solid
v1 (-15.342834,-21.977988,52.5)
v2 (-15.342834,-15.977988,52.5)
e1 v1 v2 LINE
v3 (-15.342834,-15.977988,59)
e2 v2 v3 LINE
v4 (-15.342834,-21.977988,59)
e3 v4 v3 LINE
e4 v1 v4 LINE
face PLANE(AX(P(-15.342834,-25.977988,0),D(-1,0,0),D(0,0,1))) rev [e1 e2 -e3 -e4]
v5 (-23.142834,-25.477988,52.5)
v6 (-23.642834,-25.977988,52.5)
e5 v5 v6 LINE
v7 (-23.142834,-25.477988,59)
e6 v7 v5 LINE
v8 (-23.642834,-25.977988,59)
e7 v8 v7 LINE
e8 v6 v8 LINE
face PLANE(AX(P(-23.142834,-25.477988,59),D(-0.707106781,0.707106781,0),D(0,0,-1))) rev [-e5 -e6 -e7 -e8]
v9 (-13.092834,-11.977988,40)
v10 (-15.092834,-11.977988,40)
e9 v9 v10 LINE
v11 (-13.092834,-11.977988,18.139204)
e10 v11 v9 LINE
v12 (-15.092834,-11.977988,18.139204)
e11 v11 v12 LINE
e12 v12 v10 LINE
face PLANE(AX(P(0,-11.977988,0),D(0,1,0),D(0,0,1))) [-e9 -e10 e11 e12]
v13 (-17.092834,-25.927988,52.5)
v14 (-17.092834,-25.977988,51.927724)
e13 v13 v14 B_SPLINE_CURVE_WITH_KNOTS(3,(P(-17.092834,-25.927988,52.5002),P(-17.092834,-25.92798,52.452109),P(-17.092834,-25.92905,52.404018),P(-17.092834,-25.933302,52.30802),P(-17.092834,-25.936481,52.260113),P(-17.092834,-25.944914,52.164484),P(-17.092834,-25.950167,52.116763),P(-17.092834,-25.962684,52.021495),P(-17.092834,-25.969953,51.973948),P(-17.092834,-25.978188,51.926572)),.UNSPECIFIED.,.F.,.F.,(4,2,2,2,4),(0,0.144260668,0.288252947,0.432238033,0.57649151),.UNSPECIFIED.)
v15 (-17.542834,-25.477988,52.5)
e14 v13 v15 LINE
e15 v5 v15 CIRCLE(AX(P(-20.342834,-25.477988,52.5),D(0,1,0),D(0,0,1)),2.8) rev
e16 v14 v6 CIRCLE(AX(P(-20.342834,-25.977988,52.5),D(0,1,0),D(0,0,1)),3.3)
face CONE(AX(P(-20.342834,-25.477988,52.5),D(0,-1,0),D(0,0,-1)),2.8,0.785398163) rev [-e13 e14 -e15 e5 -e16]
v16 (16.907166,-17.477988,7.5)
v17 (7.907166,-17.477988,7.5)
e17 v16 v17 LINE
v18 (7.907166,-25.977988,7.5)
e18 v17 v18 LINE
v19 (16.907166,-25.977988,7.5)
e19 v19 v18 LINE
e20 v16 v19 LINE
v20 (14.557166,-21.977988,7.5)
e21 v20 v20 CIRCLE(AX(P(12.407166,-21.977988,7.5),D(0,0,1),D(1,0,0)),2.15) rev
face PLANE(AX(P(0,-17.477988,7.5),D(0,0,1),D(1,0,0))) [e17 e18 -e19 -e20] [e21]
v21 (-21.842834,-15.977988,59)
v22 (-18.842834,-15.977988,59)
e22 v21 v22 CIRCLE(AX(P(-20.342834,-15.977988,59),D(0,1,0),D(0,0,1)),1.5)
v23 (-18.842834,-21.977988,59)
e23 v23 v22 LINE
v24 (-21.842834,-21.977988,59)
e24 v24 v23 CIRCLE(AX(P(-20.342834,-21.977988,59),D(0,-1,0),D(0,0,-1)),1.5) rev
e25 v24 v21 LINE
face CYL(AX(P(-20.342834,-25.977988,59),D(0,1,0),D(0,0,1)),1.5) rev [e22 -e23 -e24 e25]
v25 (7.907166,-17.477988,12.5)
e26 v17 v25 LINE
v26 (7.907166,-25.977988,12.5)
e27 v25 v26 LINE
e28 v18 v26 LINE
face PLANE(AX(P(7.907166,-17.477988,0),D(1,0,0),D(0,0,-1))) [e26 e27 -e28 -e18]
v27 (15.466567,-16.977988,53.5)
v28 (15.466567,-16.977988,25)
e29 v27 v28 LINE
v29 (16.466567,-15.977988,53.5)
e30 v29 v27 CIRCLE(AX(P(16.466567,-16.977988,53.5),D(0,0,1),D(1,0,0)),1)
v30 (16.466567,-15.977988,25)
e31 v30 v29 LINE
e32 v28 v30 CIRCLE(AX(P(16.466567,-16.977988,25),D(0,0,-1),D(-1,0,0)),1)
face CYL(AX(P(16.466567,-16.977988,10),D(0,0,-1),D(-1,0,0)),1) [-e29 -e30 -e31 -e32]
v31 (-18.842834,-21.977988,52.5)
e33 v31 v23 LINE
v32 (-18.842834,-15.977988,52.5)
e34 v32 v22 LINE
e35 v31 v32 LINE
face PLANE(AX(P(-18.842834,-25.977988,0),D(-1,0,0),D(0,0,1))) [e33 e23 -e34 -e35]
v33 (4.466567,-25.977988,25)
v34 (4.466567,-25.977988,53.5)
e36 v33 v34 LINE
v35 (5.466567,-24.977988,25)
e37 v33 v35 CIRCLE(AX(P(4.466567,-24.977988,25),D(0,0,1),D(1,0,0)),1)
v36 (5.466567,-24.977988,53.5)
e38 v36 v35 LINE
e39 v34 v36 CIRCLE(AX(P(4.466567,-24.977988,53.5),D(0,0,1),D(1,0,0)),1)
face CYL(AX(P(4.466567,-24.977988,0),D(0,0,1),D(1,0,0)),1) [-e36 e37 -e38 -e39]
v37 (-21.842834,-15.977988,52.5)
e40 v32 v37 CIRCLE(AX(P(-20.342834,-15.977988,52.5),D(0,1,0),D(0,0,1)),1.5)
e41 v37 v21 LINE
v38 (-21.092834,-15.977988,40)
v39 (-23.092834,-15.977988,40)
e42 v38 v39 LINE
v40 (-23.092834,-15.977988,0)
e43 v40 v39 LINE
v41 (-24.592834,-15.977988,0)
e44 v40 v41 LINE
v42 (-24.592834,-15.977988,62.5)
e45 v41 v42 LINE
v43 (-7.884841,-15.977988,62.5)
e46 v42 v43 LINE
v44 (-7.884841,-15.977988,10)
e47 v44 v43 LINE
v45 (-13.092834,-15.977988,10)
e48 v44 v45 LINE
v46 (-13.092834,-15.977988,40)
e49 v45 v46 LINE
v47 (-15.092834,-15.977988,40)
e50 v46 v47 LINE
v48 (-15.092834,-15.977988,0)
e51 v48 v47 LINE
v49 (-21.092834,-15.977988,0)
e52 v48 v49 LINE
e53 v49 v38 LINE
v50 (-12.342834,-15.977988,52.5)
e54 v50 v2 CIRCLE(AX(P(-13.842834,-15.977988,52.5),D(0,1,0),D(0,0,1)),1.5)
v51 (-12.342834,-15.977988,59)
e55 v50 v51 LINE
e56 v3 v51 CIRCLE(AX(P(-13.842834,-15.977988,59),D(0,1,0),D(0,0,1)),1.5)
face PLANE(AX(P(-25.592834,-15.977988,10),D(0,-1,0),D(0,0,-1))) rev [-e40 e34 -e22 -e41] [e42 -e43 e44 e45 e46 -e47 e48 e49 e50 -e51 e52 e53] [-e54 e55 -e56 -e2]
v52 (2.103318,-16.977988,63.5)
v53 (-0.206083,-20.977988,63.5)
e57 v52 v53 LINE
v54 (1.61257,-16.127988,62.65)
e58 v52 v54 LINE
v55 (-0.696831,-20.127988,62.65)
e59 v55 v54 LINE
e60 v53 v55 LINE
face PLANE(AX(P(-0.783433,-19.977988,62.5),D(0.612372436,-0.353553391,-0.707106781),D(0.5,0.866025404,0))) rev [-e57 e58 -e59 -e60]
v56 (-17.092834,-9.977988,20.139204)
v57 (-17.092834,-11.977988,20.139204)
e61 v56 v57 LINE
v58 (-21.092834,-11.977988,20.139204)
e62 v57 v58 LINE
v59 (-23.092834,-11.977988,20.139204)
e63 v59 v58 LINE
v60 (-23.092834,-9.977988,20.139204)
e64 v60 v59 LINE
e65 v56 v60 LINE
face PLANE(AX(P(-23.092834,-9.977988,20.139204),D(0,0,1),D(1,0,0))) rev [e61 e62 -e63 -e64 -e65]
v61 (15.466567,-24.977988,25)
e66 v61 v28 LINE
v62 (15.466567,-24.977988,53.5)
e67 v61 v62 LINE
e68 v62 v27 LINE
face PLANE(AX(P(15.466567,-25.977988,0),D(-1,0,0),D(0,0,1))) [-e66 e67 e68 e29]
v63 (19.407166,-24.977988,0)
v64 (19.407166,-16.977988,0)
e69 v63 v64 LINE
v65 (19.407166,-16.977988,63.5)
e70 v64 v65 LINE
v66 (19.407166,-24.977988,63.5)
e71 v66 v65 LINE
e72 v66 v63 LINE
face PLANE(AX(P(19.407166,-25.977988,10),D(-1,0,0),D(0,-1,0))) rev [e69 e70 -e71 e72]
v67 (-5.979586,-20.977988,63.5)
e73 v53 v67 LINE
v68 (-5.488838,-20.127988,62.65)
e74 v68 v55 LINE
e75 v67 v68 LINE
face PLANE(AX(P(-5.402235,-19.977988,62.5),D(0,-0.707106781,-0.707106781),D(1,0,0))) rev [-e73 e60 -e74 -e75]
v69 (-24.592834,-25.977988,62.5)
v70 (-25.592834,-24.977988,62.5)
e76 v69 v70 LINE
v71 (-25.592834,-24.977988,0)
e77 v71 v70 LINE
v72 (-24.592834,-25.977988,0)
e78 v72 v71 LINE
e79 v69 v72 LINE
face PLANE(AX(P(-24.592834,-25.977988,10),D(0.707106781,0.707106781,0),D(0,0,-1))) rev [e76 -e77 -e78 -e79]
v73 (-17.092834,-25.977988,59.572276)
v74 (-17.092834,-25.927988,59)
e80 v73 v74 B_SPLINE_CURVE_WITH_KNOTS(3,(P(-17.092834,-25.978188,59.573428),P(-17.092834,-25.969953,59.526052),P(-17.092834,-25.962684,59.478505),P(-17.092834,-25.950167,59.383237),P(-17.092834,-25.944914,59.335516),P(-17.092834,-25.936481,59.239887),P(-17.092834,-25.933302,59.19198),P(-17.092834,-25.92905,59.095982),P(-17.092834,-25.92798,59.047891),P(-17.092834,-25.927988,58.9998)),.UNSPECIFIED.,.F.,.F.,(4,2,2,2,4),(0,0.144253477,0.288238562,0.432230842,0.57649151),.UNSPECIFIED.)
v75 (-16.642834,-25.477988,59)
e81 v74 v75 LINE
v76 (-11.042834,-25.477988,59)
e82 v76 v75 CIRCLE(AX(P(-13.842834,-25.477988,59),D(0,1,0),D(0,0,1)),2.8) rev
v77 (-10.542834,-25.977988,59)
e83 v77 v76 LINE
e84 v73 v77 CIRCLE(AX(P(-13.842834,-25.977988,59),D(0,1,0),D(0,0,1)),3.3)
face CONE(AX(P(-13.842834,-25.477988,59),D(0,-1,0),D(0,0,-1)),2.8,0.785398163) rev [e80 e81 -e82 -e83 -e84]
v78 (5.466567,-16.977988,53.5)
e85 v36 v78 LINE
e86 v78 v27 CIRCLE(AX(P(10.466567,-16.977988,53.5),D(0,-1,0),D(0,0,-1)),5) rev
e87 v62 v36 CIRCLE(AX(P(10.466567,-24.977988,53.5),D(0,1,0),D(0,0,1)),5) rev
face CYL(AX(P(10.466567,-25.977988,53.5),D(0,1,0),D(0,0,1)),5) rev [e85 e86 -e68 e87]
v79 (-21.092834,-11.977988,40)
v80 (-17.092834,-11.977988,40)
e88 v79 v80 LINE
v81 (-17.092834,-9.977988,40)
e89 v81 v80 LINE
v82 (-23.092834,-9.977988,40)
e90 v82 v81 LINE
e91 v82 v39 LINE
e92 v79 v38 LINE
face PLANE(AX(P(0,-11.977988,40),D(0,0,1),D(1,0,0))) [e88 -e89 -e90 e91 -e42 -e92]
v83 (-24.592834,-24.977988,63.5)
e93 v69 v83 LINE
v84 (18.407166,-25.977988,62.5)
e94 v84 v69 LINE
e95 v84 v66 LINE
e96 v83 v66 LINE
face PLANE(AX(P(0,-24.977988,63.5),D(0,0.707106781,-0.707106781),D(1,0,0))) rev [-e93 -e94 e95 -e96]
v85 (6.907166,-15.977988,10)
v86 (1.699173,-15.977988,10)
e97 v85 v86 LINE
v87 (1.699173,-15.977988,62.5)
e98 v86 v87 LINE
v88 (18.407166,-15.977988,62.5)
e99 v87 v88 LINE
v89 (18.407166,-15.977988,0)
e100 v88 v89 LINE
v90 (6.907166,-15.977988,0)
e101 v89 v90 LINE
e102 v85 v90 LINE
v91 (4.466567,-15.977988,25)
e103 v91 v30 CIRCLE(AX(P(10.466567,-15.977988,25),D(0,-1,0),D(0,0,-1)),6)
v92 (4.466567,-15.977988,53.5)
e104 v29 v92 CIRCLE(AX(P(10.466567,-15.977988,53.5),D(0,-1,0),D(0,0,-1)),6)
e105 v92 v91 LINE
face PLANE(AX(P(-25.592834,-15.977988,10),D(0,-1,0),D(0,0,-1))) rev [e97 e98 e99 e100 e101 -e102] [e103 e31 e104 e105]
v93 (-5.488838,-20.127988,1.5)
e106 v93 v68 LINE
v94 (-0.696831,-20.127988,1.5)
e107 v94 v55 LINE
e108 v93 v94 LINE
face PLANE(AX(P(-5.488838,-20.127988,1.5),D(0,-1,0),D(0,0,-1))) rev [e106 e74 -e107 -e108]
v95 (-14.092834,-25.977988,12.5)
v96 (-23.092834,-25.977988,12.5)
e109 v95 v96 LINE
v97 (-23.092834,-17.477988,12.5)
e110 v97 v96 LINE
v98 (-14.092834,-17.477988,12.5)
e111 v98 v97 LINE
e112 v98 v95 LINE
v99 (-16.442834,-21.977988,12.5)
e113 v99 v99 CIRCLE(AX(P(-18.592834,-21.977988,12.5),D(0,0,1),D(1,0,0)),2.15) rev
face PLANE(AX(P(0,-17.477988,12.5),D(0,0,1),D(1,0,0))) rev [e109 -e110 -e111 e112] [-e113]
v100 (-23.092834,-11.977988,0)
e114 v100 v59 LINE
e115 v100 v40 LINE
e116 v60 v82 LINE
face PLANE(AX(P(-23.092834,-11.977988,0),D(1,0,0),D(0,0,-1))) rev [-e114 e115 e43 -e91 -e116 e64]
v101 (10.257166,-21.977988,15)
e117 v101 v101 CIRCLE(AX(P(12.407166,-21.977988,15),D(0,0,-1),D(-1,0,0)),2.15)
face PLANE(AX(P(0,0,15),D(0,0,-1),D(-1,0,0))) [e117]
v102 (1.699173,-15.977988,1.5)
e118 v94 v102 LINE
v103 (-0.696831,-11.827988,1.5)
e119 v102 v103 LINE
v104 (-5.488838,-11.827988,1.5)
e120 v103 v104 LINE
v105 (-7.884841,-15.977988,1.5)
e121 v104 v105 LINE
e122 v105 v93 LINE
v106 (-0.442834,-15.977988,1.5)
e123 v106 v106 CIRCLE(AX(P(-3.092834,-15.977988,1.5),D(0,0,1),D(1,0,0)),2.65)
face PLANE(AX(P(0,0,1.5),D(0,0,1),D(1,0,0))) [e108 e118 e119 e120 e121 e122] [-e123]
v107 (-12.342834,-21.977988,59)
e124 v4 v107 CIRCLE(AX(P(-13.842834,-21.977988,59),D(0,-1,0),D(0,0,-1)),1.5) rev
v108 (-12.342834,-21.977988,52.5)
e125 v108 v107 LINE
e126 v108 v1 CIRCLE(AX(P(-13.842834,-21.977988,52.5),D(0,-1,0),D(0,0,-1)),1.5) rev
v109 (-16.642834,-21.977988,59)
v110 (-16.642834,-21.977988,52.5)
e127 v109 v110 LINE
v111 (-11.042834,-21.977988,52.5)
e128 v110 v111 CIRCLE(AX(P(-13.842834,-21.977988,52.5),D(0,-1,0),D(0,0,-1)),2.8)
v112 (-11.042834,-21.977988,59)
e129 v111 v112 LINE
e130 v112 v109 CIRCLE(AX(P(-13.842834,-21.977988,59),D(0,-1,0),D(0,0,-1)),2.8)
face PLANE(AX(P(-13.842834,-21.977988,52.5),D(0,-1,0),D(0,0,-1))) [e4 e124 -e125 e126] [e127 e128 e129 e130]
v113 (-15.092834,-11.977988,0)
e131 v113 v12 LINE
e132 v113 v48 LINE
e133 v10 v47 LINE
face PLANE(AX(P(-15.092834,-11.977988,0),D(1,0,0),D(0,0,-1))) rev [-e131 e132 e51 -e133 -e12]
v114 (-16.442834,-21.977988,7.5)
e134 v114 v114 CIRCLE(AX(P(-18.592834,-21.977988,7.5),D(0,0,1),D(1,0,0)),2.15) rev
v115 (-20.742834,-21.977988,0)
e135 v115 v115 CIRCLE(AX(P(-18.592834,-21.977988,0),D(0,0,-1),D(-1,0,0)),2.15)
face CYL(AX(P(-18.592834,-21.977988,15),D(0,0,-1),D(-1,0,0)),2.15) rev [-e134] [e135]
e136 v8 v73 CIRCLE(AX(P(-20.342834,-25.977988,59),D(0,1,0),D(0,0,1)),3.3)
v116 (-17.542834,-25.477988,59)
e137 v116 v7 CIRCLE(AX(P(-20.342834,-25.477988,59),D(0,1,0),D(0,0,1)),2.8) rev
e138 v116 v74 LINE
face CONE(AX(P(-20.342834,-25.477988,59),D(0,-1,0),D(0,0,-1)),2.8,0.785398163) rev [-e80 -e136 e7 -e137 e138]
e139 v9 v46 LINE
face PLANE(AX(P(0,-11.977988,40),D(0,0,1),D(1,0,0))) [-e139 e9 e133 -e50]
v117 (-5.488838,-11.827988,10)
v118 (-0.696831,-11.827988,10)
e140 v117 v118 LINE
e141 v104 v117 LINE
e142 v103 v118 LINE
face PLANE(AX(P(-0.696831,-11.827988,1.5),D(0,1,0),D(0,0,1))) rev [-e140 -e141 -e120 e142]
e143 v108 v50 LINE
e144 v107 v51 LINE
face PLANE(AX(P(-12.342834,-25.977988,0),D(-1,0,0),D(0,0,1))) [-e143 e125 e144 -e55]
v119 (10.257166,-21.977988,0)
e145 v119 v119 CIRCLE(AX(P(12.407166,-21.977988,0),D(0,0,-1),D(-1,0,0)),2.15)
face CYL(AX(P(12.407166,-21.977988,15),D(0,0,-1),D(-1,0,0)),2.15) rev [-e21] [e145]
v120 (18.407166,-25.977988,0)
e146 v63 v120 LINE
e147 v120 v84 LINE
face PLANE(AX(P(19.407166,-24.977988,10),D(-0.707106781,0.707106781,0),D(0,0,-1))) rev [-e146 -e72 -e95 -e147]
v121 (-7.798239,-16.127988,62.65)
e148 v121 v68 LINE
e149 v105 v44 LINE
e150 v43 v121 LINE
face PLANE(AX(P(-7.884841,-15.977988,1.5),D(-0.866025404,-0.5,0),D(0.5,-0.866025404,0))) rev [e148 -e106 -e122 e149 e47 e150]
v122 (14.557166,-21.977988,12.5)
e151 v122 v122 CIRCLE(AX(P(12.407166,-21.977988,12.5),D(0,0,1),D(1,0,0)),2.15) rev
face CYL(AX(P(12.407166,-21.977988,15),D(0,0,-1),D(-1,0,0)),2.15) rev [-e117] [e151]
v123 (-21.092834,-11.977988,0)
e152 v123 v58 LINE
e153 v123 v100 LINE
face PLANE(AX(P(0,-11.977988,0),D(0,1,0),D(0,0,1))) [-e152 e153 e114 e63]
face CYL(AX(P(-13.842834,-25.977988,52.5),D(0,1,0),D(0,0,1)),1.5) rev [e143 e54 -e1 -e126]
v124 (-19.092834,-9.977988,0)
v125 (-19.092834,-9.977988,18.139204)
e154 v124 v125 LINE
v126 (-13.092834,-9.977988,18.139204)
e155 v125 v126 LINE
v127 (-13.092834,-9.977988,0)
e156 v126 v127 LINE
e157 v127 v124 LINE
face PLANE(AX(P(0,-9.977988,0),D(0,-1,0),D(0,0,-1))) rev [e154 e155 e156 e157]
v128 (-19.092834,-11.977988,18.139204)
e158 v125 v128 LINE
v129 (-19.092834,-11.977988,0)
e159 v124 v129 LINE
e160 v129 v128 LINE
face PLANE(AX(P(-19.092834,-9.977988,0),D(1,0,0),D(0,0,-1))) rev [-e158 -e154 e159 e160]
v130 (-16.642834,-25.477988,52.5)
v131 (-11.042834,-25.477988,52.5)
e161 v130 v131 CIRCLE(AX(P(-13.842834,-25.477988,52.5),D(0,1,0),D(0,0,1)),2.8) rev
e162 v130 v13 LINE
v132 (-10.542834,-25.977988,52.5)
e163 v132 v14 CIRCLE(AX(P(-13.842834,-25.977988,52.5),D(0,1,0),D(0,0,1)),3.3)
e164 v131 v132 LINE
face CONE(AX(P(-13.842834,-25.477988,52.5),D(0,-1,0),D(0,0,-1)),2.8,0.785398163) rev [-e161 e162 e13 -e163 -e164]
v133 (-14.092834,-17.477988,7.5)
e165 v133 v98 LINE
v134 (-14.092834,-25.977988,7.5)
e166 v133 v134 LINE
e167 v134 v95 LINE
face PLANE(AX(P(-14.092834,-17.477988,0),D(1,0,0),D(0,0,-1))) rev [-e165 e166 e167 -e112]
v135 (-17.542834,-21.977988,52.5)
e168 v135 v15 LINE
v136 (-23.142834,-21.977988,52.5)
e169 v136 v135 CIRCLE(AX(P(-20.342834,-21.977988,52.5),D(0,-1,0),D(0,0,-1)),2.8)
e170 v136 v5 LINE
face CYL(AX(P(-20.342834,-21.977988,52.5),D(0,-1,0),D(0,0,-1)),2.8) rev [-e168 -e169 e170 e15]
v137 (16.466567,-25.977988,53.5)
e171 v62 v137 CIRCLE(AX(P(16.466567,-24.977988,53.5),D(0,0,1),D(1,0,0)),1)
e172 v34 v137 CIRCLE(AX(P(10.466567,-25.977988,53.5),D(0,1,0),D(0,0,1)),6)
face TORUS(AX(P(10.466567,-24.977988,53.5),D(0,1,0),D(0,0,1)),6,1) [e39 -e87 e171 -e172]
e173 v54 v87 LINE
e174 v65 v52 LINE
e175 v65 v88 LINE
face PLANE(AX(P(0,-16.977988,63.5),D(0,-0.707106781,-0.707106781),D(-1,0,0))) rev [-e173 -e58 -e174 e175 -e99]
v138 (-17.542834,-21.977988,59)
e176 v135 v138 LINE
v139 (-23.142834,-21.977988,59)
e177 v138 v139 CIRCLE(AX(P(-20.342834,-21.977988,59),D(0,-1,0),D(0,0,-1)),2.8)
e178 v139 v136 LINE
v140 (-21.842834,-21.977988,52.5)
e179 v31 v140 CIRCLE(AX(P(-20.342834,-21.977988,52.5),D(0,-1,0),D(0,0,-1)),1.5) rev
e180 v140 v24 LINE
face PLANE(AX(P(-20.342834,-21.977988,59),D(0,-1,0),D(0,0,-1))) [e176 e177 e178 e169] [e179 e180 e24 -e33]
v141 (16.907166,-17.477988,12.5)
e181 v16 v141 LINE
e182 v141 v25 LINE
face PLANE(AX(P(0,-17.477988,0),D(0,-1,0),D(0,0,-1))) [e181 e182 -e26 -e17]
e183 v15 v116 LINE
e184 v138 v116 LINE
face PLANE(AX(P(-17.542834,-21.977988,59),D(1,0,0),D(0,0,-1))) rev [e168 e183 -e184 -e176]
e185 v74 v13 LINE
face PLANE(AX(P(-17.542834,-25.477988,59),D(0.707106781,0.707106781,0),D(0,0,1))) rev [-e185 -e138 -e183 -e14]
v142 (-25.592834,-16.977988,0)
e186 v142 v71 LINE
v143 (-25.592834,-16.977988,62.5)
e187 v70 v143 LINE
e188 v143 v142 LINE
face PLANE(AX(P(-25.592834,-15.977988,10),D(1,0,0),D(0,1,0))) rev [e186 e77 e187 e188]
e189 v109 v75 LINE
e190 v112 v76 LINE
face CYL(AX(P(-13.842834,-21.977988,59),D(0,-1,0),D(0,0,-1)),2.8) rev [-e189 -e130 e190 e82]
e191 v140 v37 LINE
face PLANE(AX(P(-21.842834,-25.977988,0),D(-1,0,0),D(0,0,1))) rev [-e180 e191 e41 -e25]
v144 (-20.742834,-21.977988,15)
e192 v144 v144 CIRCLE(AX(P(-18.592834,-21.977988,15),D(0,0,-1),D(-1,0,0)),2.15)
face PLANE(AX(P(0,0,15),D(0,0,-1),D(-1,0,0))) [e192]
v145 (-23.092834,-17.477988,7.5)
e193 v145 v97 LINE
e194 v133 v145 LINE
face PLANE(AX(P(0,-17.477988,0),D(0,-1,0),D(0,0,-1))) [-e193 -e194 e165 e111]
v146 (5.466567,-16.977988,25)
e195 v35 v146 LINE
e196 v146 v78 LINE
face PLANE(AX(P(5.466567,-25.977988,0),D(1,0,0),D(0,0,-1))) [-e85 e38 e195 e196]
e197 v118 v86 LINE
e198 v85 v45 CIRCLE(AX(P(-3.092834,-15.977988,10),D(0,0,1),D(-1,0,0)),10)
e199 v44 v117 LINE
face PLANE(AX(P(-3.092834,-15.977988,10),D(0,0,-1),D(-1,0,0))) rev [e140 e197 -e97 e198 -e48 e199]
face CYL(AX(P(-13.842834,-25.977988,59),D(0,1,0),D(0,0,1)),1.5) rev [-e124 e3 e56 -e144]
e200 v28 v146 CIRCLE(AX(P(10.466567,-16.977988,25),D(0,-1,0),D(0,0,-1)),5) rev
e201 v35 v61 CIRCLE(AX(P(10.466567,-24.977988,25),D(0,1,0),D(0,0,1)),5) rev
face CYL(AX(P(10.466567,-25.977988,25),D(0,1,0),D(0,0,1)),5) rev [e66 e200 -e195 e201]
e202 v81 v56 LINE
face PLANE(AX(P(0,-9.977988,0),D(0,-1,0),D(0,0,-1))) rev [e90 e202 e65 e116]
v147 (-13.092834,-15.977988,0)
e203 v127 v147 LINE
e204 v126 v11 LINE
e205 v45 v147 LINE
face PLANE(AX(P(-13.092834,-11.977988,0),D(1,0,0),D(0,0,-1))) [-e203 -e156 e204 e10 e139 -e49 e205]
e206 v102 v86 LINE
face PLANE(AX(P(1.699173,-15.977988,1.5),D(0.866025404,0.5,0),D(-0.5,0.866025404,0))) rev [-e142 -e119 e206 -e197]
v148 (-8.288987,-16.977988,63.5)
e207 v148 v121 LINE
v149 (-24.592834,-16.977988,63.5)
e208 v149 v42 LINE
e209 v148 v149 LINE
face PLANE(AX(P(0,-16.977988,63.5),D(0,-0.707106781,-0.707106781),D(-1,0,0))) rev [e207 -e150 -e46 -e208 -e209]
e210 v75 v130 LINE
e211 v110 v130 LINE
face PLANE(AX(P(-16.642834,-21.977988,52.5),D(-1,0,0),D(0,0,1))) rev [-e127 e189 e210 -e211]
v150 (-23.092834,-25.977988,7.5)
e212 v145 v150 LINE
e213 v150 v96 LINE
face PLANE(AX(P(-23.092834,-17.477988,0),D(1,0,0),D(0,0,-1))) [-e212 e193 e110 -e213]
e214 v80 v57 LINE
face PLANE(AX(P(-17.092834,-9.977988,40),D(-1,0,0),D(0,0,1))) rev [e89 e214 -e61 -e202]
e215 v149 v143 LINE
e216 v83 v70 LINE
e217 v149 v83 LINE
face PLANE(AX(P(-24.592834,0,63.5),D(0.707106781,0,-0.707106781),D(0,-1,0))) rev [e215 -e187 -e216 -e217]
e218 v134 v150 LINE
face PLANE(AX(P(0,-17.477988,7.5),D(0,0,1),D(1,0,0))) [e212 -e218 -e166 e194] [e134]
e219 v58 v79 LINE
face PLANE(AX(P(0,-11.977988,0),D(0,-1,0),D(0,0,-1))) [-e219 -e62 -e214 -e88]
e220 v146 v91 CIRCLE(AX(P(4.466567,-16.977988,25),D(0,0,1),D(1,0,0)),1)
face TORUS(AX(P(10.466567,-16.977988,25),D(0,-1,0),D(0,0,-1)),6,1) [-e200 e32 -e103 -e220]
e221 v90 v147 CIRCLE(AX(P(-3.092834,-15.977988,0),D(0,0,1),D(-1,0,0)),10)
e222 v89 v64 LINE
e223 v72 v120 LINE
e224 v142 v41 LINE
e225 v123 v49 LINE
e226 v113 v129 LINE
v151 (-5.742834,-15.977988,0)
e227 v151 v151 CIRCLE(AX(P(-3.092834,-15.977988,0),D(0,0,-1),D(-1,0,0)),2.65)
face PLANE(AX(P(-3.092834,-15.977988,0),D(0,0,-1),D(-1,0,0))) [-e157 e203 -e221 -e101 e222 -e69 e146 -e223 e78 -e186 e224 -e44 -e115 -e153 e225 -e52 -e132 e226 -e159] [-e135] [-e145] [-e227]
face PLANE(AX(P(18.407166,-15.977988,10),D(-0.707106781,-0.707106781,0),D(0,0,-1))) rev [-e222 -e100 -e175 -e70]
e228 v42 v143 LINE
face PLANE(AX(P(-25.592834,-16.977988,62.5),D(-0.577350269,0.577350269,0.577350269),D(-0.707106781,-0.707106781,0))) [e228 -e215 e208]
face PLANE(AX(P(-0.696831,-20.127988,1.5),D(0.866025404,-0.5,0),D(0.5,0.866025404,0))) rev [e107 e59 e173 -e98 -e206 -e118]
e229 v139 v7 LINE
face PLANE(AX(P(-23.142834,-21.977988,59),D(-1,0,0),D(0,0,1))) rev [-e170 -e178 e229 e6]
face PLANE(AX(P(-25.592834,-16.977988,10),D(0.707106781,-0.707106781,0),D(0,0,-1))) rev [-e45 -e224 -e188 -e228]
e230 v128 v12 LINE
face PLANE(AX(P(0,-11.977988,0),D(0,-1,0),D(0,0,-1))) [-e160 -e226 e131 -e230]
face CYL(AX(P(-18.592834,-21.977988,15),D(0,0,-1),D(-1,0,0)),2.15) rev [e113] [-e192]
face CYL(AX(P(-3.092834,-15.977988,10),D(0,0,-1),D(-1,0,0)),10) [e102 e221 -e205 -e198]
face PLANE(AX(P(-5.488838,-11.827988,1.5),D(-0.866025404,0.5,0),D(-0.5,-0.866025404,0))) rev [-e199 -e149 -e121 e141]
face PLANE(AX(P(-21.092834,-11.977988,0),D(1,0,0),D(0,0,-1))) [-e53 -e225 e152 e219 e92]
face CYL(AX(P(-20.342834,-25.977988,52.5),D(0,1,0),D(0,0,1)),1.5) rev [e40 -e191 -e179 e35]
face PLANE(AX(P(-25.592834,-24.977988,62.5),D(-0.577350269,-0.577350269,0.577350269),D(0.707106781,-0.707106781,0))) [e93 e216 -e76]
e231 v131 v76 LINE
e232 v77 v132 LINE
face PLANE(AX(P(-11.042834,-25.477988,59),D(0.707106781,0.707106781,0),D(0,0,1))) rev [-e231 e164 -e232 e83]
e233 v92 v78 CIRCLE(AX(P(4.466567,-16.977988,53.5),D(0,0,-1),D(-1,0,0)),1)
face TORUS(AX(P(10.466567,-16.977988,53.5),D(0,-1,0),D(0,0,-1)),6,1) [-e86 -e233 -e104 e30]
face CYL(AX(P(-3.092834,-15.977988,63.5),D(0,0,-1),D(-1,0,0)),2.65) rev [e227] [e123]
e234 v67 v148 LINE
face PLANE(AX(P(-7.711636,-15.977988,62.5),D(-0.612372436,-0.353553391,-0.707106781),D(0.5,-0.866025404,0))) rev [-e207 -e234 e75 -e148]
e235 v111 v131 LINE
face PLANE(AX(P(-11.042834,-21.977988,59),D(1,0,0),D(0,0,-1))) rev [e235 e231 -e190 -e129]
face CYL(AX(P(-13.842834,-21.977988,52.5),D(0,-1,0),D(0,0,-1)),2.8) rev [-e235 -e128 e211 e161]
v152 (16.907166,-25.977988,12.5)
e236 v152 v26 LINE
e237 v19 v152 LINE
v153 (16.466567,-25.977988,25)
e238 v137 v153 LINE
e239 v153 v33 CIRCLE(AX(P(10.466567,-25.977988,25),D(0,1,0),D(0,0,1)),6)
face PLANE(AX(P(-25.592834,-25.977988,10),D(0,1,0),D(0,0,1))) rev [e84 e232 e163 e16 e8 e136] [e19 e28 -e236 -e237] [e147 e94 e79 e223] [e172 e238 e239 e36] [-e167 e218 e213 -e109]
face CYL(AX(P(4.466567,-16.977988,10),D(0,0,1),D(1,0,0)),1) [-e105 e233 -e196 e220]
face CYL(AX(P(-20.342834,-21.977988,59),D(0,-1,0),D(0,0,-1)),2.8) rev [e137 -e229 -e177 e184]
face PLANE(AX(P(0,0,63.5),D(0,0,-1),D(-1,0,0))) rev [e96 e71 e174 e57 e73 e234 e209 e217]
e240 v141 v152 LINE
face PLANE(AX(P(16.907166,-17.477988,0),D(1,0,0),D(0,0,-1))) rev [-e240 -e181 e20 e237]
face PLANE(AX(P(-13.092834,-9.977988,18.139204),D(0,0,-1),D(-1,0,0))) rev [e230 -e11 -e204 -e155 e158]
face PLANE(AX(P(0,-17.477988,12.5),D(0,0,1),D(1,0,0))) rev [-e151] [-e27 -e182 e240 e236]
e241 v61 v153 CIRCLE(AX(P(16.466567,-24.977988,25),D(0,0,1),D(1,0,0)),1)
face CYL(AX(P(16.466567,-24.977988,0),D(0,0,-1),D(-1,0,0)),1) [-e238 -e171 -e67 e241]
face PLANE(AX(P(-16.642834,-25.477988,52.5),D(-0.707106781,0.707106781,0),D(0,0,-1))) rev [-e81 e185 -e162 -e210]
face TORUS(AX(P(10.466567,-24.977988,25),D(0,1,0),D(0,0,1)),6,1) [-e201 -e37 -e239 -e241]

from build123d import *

# Parameters (mm, degrees)
SKETCH_2_R           = 2.5
EXTRUDE_4_DEPTH      = 10
SKETCH_3_W           = 45
SKETCH_3_H           = 10
EXTRUDE_5_DEPTH      = 53.5
CUT_EXTRUDE_2_DEPTH  = 62
SKETCH_5_W           = 2
SKETCH_5_H           = 40
EXTRUDE_6_DEPTH      = 4
SKETCH_6_W           = 6
SKETCH_6_H           = 18.13920413
SKETCH_6_H_2         = 19.86079587
EXTRUDE_7_DEPTH      = 2
SKETCH_8_R           = 2
CUT_EXTRUDE_3_DEPTH  = 15
SKETCH_9_W           = 4
SKETCH_9_H           = 2
CUT_EXTRUDE_4_DEPTH  = 8
CUT_EXTRUDE_6_DEPTH  = 70.189906512
CUT_EXTRUDE_7_DEPTH  = 70.189906512
CUT_EXTRUDE_8_DEPTH  = 4
CHAMFER_1_SIZE       = 0.5
CHAMFER_2_SIZE       = 1
FILLET_1_R           = 1
FILLET_2_R           = 1
SKETCH_13_R          = 2.65
CUT_EXTRUDE_9_DEPTH  = 74.226354795
CUT_EXTRUDE_10_DEPTH = 62
SKETCH_15_R          = 2.15
CUT_EXTRUDE_11_DEPTH = 15
SKETCH_16_W          = 9
SKETCH_16_H          = 5
CUT_EXTRUDE_12_DEPTH = 8.5


with BuildPart() as part:
    # Эскиз2 → Бобышка-Вытянуть4 (new body)
    with BuildSketch(Plane.XY):
        with BuildLine():
            Line((-25.592834214, -15.977988248), (-13.092834214, -15.977988248))
            ThreePointArc((-13.092834214, -15.977988248), (-3.092834214, -5.977988248), (6.907165786, -15.977988248))
            Line((6.907165786, -15.977988248), (19.407165786, -15.977988248))
            Line((19.407165786, -15.977988248), (19.407165786, -25.977988248))
            Line((19.407165786, -25.977988248), (-25.592834214, -25.977988248))
            Line((-25.592834214, -25.977988248), (-25.592834214, -15.977988248))
        make_face()
        with Locations((-3.092834214, -15.977988248)):
            Circle(SKETCH_2_R, mode=Mode.SUBTRACT)
    extrude(amount=EXTRUDE_4_DEPTH)

    # Эскиз3 → Бобышка-Вытянуть5 (add)
    with BuildSketch(Plane.XY.offset(10)):
        with Locations((-3.092834214, -20.977988248)):
            Rectangle(SKETCH_3_W, SKETCH_3_H)
    extrude(amount=EXTRUDE_5_DEPTH)

    # Эскиз4 → Вырез-Вытянуть2 (cut)
    with BuildSketch(Plane.XY.offset(63.5)):
        Polygon((-0.783433137, -19.977988248), (1.52596794, -15.977988248), (-0.783433137, -11.977988248), (-5.40223529, -11.977988248), (-7.711636367, -15.977988248), (-5.40223529, -19.977988248), align=None)
    extrude(amount=-CUT_EXTRUDE_2_DEPTH, mode=Mode.SUBTRACT)

    # Эскиз5 → Бобышка-Вытянуть6 (add)
    with BuildSketch(Plane(origin=(0, -15.977988248, 0), x_dir=(1, 0, 0), z_dir=(0, 1, 0))):
        with Locations((-22.092834214, -20)):
            Rectangle(SKETCH_5_W, SKETCH_5_H)
        Polygon((-13.092834214, 0), (-15.092834214, 0), (-15.092834214, -40), (-13.092834214, -40), (-13.092834214, -10), align=None)
    extrude(amount=EXTRUDE_6_DEPTH)

    # Эскиз6 → Бобышка-Вытянуть7 (add)
    with BuildSketch(Plane(origin=(0, -11.977988248, 0), x_dir=(1, 0, 0), z_dir=(0, 1, 0))):
        with Locations((-16.092834214, -9.069602065)):
            Rectangle(SKETCH_6_W, SKETCH_6_H)
        with Locations((-20.092834214, -30.069602065)):
            Rectangle(SKETCH_6_W, SKETCH_6_H_2)
    extrude(amount=EXTRUDE_7_DEPTH)

    # Эскиз8 → Вырез-Вытянуть3 (cut)
    with BuildSketch(Plane(origin=(0, 0, 0), x_dir=(-1, 0, 0), z_dir=(0, 0, -1))):
        with Locations((-12.407165786, -21.977988248)):
            Circle(SKETCH_8_R)
        with Locations((18.592834214, -21.977988248)):
            Circle(SKETCH_8_R)
    extrude(amount=-CUT_EXTRUDE_3_DEPTH, mode=Mode.SUBTRACT)

    # Эскиз9 → Вырез-Вытянуть4 (cut)
    with BuildSketch(Plane.XZ.offset(25.977988248)):
        Polygon((12.407165786, 8), (12.407165786, 10), (12.407165786, 12), (8.407165786, 12), (8.407165786, 8), align=None)
        with Locations((14.407165786, 9)):
            Rectangle(SKETCH_9_W, SKETCH_9_H)
        with Locations((14.407165786, 11)):
            Rectangle(SKETCH_9_W, SKETCH_9_H)
        Polygon((-18.592834214, 12), (-14.592834214, 12), (-14.592834214, 8), (-22.592834214, 8), (-22.592834214, 12), align=None)
    extrude(amount=-CUT_EXTRUDE_4_DEPTH, mode=Mode.SUBTRACT)

    # Эскиз10 → Вырез-Вытянуть6 (cut, through all)
    with BuildSketch(Plane(origin=(0, -15.977988248, 0), x_dir=(1, 0, 0), z_dir=(0, 1, 0))):
        with BuildLine():
            Line((5.466566863, -53.5), (5.466566863, -25))
            ThreePointArc((5.466566863, -25), (10.466566863, -20), (15.466566863, -25))
            Line((15.466566863, -25), (15.466566863, -53.5))
            ThreePointArc((15.466566863, -53.5), (10.466566863, -58.5), (5.466566863, -53.5))
        make_face()
    extrude(amount=-CUT_EXTRUDE_6_DEPTH, mode=Mode.SUBTRACT)

    # Эскиз11 → Вырез-Вытянуть7 (cut, through all)
    with BuildSketch(Plane(origin=(0, -15.977988248, 0), x_dir=(1, 0, 0), z_dir=(0, 1, 0))):
        with BuildLine():
            Line((-21.842834214, -52.5), (-21.842834214, -59))
            ThreePointArc((-21.842834214, -59), (-20.342834214, -60.5), (-18.842834214, -59))
            Line((-18.842834214, -59), (-18.842834214, -52.5))
            ThreePointArc((-18.842834214, -52.5), (-20.342834214, -51), (-21.842834214, -52.5))
        make_face()
        with BuildLine():
            Line((-15.342834214, -52.5), (-15.342834214, -59))
            ThreePointArc((-15.342834214, -59), (-13.842834214, -60.5), (-12.342834214, -59))
            Line((-12.342834214, -59), (-12.342834214, -52.5))
            ThreePointArc((-12.342834214, -52.5), (-13.842834214, -51), (-15.342834214, -52.5))
        make_face()
    extrude(amount=-CUT_EXTRUDE_7_DEPTH, mode=Mode.SUBTRACT)

    # Эскиз12 → Вырез-Вытянуть8 (cut)
    with BuildSketch(Plane.XZ.offset(25.977988248)):
        with BuildLine():
            Line((-23.142834214, 59), (-23.142834214, 52.5))
            ThreePointArc((-23.142834214, 52.5), (-20.342834214, 49.7), (-17.542834214, 52.5))
            Line((-17.542834214, 52.5), (-17.542834214, 59))
            ThreePointArc((-17.542834214, 59), (-20.342834214, 61.8), (-23.142834214, 59))
        make_face()
        with BuildLine():
            Line((-16.642834214, 52.5), (-16.642834214, 59))
            ThreePointArc((-16.642834214, 59), (-13.842834214, 61.8), (-11.042834214, 59))
            Line((-11.042834214, 59), (-11.042834214, 52.5))
            ThreePointArc((-11.042834214, 52.5), (-13.842834214, 49.7), (-16.642834214, 52.5))
        make_face()
    extrude(amount=-CUT_EXTRUDE_8_DEPTH, mode=Mode.SUBTRACT)

    # Фаска1
    # the kernel refuses this chamfer: 0.5 mm, written as the material it takes off along each edge
    with BuildSketch(Plane(origin=(-20.342834214, -25.977988248, 59), x_dir=(1, 0, 0), z_dir=(0, 0, -1))) as chamfer_1_piece_1:
        Polygon((2.8 + CHAMFER_1_SIZE, 0), (2.8, -CHAMFER_1_SIZE), (2.8, 0), align=None)
    revolve(axis=Axis((-20.342834214, -25.977988248, 59), (0, -1, 0)), revolution_arc=180, mode=Mode.SUBTRACT)
    with BuildSketch(Plane(origin=(-23.142834214, -25.977988248, 59), x_dir=(-0.9996219169112968, -0.027495876610589005, 0), z_dir=(0, 0, -1)), Plane(origin=(-17.542834214, -25.977988248, 52.5), x_dir=(0.9996219169112968, -0.027495876610589196, 0), z_dir=(0, 0, 1))) as chamfer_1_piece_2:
        Polygon((CHAMFER_1_SIZE * 0.999621916911, CHAMFER_1_SIZE * 0.0274958766106), (-CHAMFER_1_SIZE * 0.0274958766106, CHAMFER_1_SIZE * 0.999621916911), (0, 0), align=None)
    extrude(amount=6.5, mode=Mode.SUBTRACT)
    with BuildSketch(Plane(origin=(-20.342834214, -25.977988248, 52.5), x_dir=(-1, 0, 0), z_dir=(0, 0, 1))) as chamfer_1_piece_3:
        Polygon((2.8 + CHAMFER_1_SIZE, 0), (2.8, -CHAMFER_1_SIZE), (2.8, 0), align=None)
    revolve(axis=Axis((-20.342834214, -25.977988248, 52.5), (0, -1, 0)), revolution_arc=180, mode=Mode.SUBTRACT)
    with BuildSketch(Plane(origin=(-13.842834214, -25.977988248, 52.5), x_dir=(1, 0, 0), z_dir=(0, 0, 1))) as chamfer_1_piece_4:
        Polygon((2.8 + CHAMFER_1_SIZE, 0), (2.8, CHAMFER_1_SIZE), (2.8, 0), align=None)
    revolve(axis=Axis((-13.842834214, -25.977988248, 52.5), (0, 1, 0)), revolution_arc=180, mode=Mode.SUBTRACT)
    with BuildSketch(Plane(origin=(-11.042834214, -25.977988248, 59), x_dir=(0.9996219169112968, -0.0274958766105891, 0), z_dir=(0, 0, -1)), Plane(origin=(-16.642834214, -25.977988248, 52.5), x_dir=(-0.9996219169112968, -0.027495876610589005, 0), z_dir=(0, 0, 1))) as chamfer_1_piece_5:
        Polygon((CHAMFER_1_SIZE * 0.999621916911, -CHAMFER_1_SIZE * 0.0274958766106), (-CHAMFER_1_SIZE * 0.0274958766106, -CHAMFER_1_SIZE * 0.999621916911), (0, 0), align=None)
    extrude(amount=6.5, mode=Mode.SUBTRACT)
    with BuildSketch(Plane(origin=(-13.842834214, -25.977988248, 59), x_dir=(-1, 0, 0), z_dir=(0, 0, -1))) as chamfer_1_piece_6:
        Polygon((2.8 + CHAMFER_1_SIZE, 0), (2.8, CHAMFER_1_SIZE), (2.8, 0), align=None)
    revolve(axis=Axis((-13.842834214, -25.977988248, 59), (0, 1, 0)), revolution_arc=180, mode=Mode.SUBTRACT)

    # Фаска2
    chamfer_2_edges = [part.edges().sort_by_distance(p)[0] for p in [
        (-25.592834214, -15.977988248, 31.75),
        (19.407165786, -15.977988248, 31.75),
        (19.407165786, -25.977988248, 31.75),
        (-25.592834214, -25.977988248, 31.75),
        (-25.592834214, -20.977988248, 63.5),
        (-3.092834214, -25.977988248, 63.5),
        (10.466566863, -15.977988248, 63.5),
        (-16.65223529, -15.977988248, 63.5),
        (0.371267401, -17.977988248, 63.5),
        (-6.556935829, -17.977988248, 63.5),
        (-3.092834214, -19.977988248, 63.5),
    ]]
    chamfer(chamfer_2_edges, length=CHAMFER_2_SIZE)

    # Скругление1
    fillet_1_edges = [part.edges().sort_by_distance(p)[0] for p in [
        (5.466566863, -15.977988248, 39.25),
        (15.466566863, -15.977988248, 39.25),
        (10.466566863, -15.977988248, 58.5),
        (10.466566863, -15.977988248, 20),
    ]]
    fillet(fillet_1_edges, radius=FILLET_1_R)

    # Скругление2
    fillet_2_edges = [part.edges().sort_by_distance(p)[0] for p in [
        (10.466566863, -25.977988248, 20),
        (10.466566863, -25.977988248, 58.5),
        (5.466566863, -25.977988248, 39.25),
        (15.466566863, -25.977988248, 39.25),
    ]]
    fillet(fillet_2_edges, radius=FILLET_2_R)

    # Эскиз13 → Вырез-Вытянуть9 (cut, through all)
    with BuildSketch(Plane(origin=(0, 0, 0), x_dir=(-1, 0, 0), z_dir=(0, 0, -1))):
        with Locations((3.092834214, -15.977988248)):
            Circle(SKETCH_13_R)
    extrude(amount=-CUT_EXTRUDE_9_DEPTH, mode=Mode.SUBTRACT)

    # Эскиз14 → Вырез-Вытянуть10 (cut)
    with BuildSketch(Plane.XY.offset(63.5)):
        Polygon((1.699173021, -15.977988248), (-0.696830597, -11.827988248), (-5.488837831, -11.827988248), (-7.884841448, -15.977988248), (-5.488837831, -20.127988248), (-0.696830597, -20.127988248), align=None)
    extrude(amount=-CUT_EXTRUDE_10_DEPTH, mode=Mode.SUBTRACT)

    # Эскиз15 → Вырез-Вытянуть11 (cut)
    with BuildSketch(Plane(origin=(0, 0, 0), x_dir=(-1, 0, 0), z_dir=(0, 0, -1))):
        with Locations((18.592834214, -21.977988248)):
            Circle(SKETCH_15_R)
        with Locations((-12.407165786, -21.977988248)):
            Circle(SKETCH_15_R)
    extrude(amount=-CUT_EXTRUDE_11_DEPTH, mode=Mode.SUBTRACT)

    # Эскиз16 → Вырез-Вытянуть12 (cut)
    with BuildSketch(Plane.XZ.offset(25.977988248)):
        with Locations((12.407165786, 10)):
            Rectangle(SKETCH_16_W, SKETCH_16_H)
        with Locations((-18.592834214, 10)):
            Rectangle(SKETCH_16_W, SKETCH_16_H)
    extrude(amount=-CUT_EXTRUDE_12_DEPTH, mode=Mode.SUBTRACT)


solid = part.part
